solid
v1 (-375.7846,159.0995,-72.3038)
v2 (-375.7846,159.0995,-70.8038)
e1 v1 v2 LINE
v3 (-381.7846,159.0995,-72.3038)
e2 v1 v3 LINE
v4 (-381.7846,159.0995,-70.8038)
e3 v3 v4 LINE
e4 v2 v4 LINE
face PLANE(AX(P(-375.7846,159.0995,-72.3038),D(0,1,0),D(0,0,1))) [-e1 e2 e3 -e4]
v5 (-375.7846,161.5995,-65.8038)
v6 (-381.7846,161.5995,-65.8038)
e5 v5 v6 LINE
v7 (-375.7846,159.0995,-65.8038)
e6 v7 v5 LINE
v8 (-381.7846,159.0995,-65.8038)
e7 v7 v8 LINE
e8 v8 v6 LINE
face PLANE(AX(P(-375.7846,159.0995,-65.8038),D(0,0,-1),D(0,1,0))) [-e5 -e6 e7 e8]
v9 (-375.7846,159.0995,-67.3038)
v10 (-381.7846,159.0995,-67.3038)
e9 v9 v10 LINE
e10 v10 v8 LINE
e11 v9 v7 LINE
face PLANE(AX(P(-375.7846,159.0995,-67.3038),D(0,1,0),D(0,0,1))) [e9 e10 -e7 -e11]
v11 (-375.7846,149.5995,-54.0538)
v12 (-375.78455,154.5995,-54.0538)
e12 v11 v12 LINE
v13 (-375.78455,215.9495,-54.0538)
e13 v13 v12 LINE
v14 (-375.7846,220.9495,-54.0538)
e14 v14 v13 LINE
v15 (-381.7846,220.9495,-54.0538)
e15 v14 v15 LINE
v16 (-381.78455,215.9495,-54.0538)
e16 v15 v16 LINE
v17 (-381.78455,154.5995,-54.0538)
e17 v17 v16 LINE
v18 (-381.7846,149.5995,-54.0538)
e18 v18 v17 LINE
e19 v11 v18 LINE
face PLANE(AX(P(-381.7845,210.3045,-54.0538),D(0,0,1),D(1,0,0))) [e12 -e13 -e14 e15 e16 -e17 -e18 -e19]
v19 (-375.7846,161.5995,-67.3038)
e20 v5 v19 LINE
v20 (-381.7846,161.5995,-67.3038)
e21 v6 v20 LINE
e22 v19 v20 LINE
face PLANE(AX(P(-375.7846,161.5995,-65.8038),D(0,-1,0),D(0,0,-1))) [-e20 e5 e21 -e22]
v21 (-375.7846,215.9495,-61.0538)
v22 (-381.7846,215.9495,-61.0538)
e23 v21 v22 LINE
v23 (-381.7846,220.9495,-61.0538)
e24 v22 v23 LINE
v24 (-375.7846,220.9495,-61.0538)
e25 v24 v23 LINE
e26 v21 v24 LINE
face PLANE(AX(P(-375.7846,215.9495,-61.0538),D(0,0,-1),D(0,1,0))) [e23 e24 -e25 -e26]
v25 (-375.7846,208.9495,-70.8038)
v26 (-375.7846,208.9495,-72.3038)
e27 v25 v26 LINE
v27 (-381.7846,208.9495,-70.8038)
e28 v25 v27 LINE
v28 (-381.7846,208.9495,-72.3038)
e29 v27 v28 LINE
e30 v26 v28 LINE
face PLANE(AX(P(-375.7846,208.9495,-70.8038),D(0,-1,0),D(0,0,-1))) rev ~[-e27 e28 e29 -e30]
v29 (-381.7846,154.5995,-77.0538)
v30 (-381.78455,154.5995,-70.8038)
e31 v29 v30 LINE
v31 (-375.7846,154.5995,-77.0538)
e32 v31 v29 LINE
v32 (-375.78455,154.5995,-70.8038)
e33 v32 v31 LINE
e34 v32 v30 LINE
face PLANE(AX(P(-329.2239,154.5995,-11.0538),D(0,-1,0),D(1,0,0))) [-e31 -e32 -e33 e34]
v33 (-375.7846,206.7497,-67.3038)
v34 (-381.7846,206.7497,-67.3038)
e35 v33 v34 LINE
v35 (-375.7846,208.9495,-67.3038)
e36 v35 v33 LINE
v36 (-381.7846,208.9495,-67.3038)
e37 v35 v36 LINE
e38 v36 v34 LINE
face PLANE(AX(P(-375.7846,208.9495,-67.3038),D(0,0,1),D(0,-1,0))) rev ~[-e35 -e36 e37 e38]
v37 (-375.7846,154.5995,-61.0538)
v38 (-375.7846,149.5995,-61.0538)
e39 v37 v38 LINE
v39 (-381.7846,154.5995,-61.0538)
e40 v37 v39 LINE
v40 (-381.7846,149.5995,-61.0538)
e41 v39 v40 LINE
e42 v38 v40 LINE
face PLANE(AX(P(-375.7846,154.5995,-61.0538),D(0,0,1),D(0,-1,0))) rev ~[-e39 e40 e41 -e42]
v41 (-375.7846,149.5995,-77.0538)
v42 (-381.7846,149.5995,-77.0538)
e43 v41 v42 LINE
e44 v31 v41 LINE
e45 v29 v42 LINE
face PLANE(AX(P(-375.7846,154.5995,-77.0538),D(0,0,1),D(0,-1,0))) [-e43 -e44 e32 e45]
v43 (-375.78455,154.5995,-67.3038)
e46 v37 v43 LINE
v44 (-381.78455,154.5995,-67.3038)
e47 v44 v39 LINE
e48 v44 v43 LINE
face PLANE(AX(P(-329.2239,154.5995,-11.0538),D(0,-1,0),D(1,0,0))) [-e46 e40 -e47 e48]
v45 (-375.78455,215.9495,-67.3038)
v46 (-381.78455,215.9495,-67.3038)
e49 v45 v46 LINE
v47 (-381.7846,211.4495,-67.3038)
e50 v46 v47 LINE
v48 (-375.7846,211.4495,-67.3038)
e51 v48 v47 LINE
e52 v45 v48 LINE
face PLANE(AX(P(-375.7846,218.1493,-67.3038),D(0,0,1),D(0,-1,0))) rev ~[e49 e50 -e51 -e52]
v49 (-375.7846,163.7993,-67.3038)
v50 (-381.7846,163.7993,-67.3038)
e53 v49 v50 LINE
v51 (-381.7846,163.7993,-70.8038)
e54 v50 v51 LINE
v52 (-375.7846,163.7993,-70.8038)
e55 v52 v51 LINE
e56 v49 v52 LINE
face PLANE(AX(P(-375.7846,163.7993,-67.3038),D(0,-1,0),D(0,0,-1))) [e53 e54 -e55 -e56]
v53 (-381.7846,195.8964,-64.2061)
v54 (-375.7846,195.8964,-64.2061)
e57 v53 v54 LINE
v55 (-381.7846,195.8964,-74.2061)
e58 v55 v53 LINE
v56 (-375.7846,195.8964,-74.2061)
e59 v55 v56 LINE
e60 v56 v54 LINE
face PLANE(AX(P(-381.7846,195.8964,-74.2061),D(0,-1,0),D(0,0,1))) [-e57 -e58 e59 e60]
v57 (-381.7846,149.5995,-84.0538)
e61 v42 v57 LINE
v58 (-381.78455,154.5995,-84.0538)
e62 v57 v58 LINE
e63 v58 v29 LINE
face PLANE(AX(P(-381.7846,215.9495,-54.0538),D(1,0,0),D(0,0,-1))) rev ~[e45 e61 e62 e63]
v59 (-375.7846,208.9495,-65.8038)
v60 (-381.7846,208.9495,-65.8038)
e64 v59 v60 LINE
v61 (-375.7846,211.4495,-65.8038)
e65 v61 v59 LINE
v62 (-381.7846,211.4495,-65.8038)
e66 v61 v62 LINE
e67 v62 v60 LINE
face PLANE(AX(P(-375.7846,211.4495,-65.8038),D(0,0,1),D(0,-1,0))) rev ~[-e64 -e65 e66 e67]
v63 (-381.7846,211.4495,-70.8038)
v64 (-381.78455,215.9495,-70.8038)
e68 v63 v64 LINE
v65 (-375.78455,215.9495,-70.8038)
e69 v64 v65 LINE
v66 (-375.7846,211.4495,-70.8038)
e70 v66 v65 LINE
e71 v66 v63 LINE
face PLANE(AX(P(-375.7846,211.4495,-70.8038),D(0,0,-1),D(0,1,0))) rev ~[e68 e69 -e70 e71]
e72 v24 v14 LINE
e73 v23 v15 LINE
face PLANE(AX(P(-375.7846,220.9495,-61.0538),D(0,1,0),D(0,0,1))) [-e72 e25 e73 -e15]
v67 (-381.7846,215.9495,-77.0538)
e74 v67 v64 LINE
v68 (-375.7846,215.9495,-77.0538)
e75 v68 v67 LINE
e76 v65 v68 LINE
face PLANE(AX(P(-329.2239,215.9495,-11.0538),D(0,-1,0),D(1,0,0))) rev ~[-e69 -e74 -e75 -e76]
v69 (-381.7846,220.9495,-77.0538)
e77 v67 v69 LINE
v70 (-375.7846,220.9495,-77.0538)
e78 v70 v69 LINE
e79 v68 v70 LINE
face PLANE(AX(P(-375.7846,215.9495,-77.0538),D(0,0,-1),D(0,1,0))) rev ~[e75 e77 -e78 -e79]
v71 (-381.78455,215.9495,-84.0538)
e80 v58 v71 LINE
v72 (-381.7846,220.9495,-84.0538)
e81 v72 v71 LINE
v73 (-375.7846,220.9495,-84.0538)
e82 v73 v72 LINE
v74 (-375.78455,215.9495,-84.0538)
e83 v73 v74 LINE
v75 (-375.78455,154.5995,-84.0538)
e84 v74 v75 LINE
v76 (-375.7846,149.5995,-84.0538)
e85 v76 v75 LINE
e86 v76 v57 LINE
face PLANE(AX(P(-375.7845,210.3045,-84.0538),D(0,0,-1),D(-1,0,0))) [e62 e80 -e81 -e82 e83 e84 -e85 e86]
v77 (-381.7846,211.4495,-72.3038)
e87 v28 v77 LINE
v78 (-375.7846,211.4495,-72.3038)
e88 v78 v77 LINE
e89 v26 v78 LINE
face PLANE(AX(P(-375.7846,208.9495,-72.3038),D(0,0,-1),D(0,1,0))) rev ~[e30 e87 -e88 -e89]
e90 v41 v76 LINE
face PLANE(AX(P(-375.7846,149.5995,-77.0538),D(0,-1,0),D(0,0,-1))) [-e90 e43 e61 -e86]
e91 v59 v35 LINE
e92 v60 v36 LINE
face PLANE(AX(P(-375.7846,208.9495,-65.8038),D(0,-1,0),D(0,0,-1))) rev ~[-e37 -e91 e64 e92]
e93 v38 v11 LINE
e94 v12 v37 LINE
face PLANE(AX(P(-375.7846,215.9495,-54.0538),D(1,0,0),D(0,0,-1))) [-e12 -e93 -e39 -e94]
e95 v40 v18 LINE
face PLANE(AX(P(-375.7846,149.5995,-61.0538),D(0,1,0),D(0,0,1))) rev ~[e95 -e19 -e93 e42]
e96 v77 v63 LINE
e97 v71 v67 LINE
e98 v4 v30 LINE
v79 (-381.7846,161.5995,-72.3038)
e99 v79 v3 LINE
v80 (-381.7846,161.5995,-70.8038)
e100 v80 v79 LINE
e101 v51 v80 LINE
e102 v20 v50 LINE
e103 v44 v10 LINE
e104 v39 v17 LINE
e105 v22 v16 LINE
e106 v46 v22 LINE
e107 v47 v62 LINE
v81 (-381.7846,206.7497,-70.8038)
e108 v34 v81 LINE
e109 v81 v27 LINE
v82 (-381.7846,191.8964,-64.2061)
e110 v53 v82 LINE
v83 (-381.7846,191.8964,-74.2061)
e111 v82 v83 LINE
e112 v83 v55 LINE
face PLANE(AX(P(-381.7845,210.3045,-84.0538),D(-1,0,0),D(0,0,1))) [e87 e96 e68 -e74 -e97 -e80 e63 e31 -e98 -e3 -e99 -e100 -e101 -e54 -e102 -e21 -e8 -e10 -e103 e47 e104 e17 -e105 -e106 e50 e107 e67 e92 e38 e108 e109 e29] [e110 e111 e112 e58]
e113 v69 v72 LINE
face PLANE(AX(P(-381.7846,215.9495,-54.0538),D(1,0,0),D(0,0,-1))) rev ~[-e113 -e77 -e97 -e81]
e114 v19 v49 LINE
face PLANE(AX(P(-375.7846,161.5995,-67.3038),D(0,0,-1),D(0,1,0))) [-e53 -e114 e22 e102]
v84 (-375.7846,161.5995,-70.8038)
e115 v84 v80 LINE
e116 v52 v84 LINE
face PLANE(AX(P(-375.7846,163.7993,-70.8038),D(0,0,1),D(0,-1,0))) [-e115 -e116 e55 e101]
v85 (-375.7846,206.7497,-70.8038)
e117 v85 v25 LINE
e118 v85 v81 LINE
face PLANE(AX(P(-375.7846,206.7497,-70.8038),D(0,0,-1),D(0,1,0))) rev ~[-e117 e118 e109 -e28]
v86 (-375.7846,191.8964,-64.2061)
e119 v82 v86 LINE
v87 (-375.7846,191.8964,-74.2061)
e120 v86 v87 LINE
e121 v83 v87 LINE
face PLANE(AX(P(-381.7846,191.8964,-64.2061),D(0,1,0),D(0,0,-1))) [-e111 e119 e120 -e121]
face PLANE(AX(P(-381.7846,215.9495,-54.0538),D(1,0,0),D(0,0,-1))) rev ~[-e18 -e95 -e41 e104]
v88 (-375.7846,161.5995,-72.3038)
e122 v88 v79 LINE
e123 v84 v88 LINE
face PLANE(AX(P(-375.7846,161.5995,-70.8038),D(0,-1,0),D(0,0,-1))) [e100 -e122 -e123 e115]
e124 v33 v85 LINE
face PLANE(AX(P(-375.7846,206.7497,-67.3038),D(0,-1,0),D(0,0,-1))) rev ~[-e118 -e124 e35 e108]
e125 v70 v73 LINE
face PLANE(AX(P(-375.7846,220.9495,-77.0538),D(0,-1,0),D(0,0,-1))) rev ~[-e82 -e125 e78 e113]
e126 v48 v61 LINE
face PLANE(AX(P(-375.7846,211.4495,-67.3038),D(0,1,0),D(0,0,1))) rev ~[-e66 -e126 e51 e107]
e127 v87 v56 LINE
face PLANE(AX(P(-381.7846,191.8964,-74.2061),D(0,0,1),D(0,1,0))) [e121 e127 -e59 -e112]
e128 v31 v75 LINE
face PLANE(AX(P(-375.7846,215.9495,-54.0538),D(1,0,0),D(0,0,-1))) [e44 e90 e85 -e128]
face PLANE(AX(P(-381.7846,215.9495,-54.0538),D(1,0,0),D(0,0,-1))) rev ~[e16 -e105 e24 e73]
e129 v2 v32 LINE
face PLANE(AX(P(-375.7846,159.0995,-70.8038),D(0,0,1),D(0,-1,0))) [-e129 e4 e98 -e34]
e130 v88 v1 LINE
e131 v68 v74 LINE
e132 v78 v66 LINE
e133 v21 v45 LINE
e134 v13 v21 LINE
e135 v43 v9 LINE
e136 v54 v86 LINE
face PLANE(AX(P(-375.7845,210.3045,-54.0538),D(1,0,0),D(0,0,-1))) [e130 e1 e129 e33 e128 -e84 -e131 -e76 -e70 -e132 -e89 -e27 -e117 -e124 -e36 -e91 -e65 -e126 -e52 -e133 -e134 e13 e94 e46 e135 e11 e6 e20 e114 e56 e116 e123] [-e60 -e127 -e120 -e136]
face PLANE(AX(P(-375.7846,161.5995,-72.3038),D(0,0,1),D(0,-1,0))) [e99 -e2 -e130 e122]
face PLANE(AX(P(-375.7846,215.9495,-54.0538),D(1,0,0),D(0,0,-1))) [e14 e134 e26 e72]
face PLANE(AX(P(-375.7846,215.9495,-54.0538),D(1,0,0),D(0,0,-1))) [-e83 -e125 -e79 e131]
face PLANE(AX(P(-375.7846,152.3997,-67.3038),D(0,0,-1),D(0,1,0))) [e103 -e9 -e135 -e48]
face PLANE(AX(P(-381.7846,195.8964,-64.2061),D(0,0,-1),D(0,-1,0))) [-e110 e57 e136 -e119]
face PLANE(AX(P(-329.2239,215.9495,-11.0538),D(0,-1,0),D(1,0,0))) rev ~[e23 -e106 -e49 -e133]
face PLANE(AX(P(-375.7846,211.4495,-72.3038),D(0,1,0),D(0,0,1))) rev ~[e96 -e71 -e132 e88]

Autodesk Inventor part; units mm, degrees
ref_plane "YZ Plane" through (0, 0, 0) normal (1, 0, 0) x (0, 1, 0)
ref_plane "XZ Plane" through (0, 0, 0) normal (0, 1, 0) x (-1, 0, 0)
ref_plane "РабПлоскость1" through (-329.2239, 210.3045, -11.0538) normal (0, -1, 0) x (1, 0, 0)
sketch "Эскиз1" plane through (-329.2239, 210.3045, -11.0538) normal (0, -1, 0) x (1, 0, 0)
  line L0 (-46.5606, -73) -> (-52.5606, -73)
  line L1 (-52.5606, -73) -> (-52.5606, -43)
  line L2 (-52.5606, -43) -> (-46.5606, -43)
  line L3 (-46.5606, -43) -> (-46.5606, -73)
  line L4 (-23.55, -78) -> (-51.55, -78) projected
  point P0 (329.2239, 11.0538)
  dimension "d0" = 6
  dimension "d1" = 30
  dimension "d2" = 5
ref_plane "РабПлоскость2" through (-464.2239, 154.5996, -124.0538) normal (0, 1, 0) x (0, 0, 1)
extrude "Выдавливание1" add sketch "Эскиз1" along normal blind 55.705 and the other way blind 5.645
sketch "Эскиз2" plane through (-375.7846, 215.9495, -54.0538) normal (1, 0, 0) x (0, 0, -1)
  line L0 (30, 0) -> (30, -61.35) projected
  line L1 (30, -30.675) -> (0, -30.675)
  line L2 (0, 0) -> (0, -61.35) projected
  line L3 (30, 0) -> (23, 0)
  line L4 (23, 0) -> (23, 5)
  line L5 (23, 5) -> (30, 5)
  line L6 (30, 5) -> (30, 0)
  line L7 (0, 0) -> (7, 0)
  line L8 (7, 0) -> (7, 5)
  line L9 (7, 5) -> (0, 5)
  line L10 (0, 5) -> (0, 0)
  line L11 (18.25, -4.5) -> (11.75, -4.5)
  line L12 (11.75, -4.5) -> (11.75, -7)
  line L13 (11.75, -7) -> (18.25, -7)
  line L14 (18.25, -7) -> (18.25, -4.5)
  line L15 (13.25, -9.1998) -> (16.75, -9.1998)
  line L16 (16.75, -9.1998) -> (16.75, 2.1998)
  line L17 (16.75, 2.1998) -> (13.25, 2.1998)
  line L18 (13.25, 2.1998) -> (13.25, -9.1998)
  line L19 (13.25, -9.1998) -> (16.75, 2.1998) construction
  line L20 (16.75, -9.1998) -> (13.25, 2.1998) construction
  line L21 (30, -61.35) -> (23, -61.35)
  line L22 (23, -61.35) -> (23, -66.35)
  line L23 (23, -66.35) -> (30, -66.35)
  line L24 (30, -66.35) -> (30, -61.35)
  line L25 (0, -61.35) -> (7, -61.35)
  line L26 (7, -61.35) -> (7, -66.35)
  line L27 (7, -66.35) -> (0, -66.35)
  line L28 (0, -66.35) -> (0, -61.35)
  line L29 (18.25, -54.35) -> (18.25, -56.85)
  line L30 (16.75, -63.5498) -> (13.25, -63.5498)
  line L31 (16.75, -52.1502) -> (16.75, -63.5498)
  line L32 (13.25, -52.1502) -> (16.75, -52.1502)
  line L33 (13.25, -52.1502) -> (16.75, -63.5498) construction
  line L34 (13.25, -63.5498) -> (13.25, -52.1502)
  line L35 (16.75, -52.1502) -> (13.25, -63.5498) construction
  line L36 (18.25, -56.85) -> (11.75, -56.85)
  line L37 (11.75, -56.85) -> (11.75, -54.35)
  line L38 (11.75, -54.35) -> (18.25, -54.35)
  point P0 (-54.0538, -215.9495)
  point P1 (0, -55.705)
  point P2 (30, -55.705)
  point P3 (15, -3.5)
  point P4 (16.75, -7)
  point P5 (16.75, -4.5)
  point P6 (13.25, -4.5)
  point P7 (13.25, -7)
  point P8 (15, -57.85)
  point P9 (16.75, -56.85)
  point P10 (16.75, -54.35)
  point P11 (13.25, -54.35)
  point P12 (13.25, -56.85)
  dimension "d23" = 5
  dimension "d24" = 7
  dimension "d25" = 7
extrude "Выдавливание2" add sketch "Эскиз2" against normal blind 6 contours L3 L4 L5 L6 | L10 L9 L8 L7 | L24 L23 L22 L21 | L25 L26 L27 L28
extrude "Выдавливание3" cut sketch "Эскиз2" against normal blind 6 contours L14 L13 L16 L11 | L16 L13 L18 L11 | L11 L18 L17 L16 | L18 L13 L12 L11 | L16 L15 L18 L13 | L29 L36 L31 L38 | L38 L34 L32 L31 | L31 L36 L34 L38 | L31 L30 L34 L36 | L34 L36 L37 L38
sketch "Эскиз6" plane through (-381.7846, 149.5995, -84.0538) normal (-1, 0, 0) x (0, 0, 1)
  line L0 (19.8477, 42.2969) -> (9.8477, 42.2969)
  line L1 (9.8477, 46.2969) -> (19.8477, 46.2969)
  line L2 (19.8477, 46.2969) -> (19.8477, 42.2969)
  line L3 (9.8477, 42.2969) -> (9.8477, 46.2969)
  point P0 (84.0538, -149.5995)
extrude "Выдавливание5" cut sketch "Эскиз6" against normal blind 6
properties part number "стенка 2"
